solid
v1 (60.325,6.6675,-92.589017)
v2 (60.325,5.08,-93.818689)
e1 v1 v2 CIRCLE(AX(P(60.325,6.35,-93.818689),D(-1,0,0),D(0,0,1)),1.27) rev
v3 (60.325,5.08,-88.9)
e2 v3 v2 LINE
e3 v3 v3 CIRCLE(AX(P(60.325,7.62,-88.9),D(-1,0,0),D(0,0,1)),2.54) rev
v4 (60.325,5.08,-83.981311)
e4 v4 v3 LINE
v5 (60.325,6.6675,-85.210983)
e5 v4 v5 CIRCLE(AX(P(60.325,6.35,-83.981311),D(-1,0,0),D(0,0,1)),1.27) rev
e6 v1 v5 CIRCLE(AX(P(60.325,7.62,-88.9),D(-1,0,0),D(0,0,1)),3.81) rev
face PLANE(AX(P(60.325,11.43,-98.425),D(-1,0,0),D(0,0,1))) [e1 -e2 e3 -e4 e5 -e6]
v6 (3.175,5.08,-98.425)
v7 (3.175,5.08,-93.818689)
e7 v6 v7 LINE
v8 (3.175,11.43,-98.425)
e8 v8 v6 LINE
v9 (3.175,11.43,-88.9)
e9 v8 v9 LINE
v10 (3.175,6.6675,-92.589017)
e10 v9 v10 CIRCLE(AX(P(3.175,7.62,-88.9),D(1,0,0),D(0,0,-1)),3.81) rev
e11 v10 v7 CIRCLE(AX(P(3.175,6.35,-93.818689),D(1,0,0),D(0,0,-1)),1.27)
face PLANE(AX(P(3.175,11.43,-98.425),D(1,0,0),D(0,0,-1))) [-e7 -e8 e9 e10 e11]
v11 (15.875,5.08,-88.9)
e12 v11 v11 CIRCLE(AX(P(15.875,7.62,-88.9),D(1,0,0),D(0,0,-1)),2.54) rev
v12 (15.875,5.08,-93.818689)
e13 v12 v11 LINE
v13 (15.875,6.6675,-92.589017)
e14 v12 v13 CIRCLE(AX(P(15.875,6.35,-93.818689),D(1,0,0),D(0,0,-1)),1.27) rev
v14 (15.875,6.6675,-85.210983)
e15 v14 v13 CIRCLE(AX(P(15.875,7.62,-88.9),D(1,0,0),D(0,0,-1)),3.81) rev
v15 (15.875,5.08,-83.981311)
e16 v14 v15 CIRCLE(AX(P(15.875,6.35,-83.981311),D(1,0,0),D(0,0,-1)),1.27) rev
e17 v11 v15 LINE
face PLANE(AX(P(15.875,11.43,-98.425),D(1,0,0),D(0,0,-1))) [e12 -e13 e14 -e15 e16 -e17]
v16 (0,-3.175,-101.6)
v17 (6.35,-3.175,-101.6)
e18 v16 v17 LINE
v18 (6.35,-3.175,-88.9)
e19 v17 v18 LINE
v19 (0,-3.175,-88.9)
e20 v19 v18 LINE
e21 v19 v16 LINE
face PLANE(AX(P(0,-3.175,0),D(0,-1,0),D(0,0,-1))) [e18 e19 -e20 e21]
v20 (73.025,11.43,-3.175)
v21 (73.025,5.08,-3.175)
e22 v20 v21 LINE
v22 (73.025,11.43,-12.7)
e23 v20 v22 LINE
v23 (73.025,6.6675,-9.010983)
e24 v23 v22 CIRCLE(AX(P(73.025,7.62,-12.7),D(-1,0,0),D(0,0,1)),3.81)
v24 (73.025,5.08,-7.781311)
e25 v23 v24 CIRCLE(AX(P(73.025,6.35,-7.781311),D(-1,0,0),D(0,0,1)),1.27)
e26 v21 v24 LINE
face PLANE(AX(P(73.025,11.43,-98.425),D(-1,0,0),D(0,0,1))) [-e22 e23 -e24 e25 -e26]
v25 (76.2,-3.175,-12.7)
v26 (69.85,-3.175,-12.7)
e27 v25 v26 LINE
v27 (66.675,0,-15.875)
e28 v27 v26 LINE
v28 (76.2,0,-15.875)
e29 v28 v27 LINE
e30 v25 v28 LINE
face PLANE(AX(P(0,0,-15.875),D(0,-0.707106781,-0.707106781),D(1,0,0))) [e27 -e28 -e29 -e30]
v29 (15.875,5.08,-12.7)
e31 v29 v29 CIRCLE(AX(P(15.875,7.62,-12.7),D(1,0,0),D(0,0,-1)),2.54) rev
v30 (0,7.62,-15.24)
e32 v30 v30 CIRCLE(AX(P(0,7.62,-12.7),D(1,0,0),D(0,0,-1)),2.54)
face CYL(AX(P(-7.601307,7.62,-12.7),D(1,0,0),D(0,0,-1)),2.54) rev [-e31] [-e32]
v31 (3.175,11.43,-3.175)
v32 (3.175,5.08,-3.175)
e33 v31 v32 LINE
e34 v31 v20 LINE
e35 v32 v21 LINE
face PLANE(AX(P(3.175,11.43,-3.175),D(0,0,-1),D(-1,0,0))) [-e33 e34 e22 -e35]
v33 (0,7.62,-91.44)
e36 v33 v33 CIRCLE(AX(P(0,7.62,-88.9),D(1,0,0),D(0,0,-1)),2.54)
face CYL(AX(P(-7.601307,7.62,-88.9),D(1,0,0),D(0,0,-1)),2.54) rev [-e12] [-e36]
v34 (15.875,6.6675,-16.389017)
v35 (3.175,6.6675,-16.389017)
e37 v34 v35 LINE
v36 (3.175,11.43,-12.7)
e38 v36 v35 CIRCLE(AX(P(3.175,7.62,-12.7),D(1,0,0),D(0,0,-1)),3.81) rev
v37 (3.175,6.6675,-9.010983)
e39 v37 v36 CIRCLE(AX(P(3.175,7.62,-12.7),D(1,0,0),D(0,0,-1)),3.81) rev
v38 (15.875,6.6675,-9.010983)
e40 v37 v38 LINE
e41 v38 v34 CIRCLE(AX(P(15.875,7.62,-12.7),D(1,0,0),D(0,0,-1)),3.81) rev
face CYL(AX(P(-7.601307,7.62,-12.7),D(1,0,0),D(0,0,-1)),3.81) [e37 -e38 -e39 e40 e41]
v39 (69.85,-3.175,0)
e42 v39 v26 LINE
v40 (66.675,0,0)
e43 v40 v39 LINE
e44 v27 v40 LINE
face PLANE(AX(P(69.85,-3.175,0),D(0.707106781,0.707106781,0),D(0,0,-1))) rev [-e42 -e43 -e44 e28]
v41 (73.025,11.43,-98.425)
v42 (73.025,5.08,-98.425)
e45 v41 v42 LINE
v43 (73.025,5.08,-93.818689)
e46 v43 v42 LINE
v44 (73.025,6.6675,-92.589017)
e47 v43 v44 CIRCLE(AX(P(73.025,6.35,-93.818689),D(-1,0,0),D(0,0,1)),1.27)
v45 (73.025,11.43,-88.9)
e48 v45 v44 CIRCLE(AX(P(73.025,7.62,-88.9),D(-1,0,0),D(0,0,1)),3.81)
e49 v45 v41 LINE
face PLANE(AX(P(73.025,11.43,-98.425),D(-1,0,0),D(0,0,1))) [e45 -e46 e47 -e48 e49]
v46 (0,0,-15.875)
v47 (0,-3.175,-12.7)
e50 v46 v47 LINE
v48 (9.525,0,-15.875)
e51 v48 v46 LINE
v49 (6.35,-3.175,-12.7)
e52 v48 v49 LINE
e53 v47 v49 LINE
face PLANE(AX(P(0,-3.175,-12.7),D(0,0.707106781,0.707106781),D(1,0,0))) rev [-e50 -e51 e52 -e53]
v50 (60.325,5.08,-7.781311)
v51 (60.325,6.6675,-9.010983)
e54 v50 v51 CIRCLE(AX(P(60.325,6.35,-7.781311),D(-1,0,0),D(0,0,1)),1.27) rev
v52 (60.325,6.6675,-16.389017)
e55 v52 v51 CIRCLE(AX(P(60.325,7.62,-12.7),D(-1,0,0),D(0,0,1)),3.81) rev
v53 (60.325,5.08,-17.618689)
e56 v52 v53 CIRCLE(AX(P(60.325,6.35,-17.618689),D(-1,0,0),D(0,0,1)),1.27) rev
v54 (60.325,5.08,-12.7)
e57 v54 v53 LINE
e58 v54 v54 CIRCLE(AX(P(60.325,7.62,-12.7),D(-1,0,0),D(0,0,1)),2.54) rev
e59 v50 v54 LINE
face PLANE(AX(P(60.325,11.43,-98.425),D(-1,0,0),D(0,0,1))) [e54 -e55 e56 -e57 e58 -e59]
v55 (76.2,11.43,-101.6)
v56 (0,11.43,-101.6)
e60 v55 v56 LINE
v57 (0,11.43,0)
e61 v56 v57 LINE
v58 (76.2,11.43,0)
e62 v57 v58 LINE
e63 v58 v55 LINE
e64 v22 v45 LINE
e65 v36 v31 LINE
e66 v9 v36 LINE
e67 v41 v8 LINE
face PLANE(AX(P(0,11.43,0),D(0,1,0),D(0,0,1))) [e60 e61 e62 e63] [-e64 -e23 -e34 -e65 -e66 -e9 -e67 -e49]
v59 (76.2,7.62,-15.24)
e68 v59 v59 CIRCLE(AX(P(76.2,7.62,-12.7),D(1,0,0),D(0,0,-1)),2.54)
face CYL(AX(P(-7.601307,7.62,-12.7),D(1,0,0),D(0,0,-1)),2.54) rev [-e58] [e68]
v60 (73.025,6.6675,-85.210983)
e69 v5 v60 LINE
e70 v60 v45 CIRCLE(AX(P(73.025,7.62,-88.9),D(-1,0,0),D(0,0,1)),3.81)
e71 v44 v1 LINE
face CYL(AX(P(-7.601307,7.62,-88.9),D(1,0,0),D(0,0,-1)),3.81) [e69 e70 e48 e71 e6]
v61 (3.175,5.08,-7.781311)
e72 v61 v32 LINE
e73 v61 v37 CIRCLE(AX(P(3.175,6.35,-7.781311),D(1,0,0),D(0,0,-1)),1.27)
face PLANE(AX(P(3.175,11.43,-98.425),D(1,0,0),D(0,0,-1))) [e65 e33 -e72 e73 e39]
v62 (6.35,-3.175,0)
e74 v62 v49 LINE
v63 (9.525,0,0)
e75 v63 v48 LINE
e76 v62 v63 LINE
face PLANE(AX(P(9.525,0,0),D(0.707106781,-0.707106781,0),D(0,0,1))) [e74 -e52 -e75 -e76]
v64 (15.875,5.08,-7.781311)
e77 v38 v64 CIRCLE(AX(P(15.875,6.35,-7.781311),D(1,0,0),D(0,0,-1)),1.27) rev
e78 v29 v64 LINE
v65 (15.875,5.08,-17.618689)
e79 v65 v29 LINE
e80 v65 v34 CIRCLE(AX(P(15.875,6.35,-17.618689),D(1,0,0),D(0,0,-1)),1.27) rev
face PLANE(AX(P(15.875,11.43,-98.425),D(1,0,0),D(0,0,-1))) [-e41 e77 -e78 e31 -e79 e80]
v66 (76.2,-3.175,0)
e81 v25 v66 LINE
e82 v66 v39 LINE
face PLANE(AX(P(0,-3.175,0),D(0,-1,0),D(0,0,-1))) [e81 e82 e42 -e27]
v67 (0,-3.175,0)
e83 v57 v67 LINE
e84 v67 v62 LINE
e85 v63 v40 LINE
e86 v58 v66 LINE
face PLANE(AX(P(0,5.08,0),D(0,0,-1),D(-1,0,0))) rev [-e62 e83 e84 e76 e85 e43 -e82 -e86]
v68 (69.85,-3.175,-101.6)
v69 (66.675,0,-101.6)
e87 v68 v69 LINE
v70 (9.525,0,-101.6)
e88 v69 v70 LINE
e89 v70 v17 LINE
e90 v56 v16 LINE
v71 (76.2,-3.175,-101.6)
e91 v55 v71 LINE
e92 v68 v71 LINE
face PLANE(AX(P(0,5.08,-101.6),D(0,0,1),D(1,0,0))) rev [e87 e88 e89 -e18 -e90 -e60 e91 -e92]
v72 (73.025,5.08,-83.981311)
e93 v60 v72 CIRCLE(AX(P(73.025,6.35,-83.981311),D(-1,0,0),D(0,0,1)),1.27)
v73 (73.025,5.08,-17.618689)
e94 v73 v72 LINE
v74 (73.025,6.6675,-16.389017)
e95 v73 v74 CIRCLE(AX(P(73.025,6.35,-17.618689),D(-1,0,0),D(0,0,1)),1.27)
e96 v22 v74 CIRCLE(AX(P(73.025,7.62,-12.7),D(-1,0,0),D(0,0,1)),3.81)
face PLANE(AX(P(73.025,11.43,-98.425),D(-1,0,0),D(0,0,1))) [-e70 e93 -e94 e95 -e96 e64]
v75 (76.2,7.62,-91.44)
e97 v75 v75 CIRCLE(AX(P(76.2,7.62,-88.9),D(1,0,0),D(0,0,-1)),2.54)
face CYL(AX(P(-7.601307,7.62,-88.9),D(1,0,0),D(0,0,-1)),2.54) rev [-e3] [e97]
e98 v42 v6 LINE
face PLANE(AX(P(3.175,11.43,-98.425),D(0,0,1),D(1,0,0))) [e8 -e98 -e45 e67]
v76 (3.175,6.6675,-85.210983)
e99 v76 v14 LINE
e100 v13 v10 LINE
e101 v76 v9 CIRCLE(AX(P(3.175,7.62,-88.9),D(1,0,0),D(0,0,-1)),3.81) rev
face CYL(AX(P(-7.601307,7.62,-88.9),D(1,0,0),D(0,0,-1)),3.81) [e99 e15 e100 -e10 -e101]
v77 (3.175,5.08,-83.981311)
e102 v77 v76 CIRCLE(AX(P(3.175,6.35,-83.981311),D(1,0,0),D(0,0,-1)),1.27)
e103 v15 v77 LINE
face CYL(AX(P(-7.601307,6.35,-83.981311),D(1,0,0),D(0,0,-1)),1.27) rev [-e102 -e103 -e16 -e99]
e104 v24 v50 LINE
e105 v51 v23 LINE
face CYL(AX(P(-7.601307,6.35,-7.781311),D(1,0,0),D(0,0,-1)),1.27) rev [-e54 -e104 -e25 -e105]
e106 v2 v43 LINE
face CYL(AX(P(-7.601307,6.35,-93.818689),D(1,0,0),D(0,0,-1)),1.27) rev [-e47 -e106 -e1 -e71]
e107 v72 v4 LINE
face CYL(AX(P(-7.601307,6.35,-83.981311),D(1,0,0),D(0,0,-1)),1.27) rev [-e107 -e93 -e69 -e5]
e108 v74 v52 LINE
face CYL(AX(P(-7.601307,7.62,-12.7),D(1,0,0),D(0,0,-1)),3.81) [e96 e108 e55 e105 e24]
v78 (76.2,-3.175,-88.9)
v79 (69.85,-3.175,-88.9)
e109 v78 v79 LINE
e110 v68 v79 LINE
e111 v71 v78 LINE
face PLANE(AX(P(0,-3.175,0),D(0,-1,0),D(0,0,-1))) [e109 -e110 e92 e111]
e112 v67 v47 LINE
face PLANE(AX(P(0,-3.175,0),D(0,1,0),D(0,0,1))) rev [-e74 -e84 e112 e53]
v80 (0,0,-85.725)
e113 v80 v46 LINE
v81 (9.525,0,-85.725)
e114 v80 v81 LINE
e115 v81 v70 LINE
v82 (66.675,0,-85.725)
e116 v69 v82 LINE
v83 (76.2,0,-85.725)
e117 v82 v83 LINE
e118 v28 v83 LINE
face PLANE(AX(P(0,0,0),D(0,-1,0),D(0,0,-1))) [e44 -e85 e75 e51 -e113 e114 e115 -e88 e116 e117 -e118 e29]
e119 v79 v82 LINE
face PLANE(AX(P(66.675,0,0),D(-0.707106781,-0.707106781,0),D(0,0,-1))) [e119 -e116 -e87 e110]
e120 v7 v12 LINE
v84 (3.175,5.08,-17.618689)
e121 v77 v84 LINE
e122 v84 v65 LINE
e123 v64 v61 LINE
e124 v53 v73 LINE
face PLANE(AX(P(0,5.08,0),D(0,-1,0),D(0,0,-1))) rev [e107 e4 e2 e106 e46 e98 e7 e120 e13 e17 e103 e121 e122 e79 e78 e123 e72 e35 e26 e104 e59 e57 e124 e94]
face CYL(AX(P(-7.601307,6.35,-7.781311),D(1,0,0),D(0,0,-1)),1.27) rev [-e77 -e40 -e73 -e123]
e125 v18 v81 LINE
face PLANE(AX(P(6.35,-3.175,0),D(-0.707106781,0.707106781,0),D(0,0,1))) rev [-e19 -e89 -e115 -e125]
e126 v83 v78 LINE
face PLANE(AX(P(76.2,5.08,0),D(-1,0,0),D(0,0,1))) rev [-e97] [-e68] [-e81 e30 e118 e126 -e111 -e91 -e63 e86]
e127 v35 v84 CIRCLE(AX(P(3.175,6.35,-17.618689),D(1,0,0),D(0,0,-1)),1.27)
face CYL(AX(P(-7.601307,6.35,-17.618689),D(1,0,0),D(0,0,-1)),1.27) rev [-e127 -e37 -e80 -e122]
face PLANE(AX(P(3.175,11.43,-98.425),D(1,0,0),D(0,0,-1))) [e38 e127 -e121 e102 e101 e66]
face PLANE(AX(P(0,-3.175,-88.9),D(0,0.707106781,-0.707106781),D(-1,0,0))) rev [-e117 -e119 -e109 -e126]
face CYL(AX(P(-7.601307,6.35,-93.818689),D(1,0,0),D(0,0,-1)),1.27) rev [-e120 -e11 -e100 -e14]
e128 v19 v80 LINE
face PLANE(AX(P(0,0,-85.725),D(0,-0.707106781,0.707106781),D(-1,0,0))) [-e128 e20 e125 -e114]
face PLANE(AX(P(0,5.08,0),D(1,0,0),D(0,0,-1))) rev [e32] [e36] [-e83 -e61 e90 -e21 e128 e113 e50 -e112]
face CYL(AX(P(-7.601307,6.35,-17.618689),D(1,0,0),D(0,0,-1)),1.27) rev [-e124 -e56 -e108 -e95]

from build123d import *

# Parameters (mm, degrees)
SKETCH1_W           = 76.2
SKETCH1_H           = 101.6
BOSS_EXTRUDE1_DEPTH = 5.08
SKETCH4_W           = 76.2
SKETCH4_H           = 101.6
SKETCH4_W_2         = 69.85
SKETCH4_H_2         = 95.25
BOSS_EXTRUDE3_DEPTH = 6.35
SKETCH5_R           = 3.81
SKETCH5_R_2         = 2.54
BOSS_EXTRUDE4_DEPTH = 73.025
SKETCH6_R           = 2.54
CUT_EXTRUDE2_DEPTH  = 128.513312638
SKETCH7_W           = 44.45
SKETCH7_H           = 95.25
CUT_EXTRUDE3_DEPTH  = 128.158650905
FILLET1_R           = 1.27
SKETCH8_W           = 6.35
SKETCH8_H           = 12.7
BOSS_EXTRUDE5_DEPTH = 3.175
CHAMFER1_SIZE       = 3.175


with BuildPart() as part:
    # Sketch1 → Boss-Extrude1 (new body)
    with BuildSketch(Plane(origin=(0, 0, 0), x_dir=(1, 0, 0), z_dir=(0, 1, 0))):
        with Locations((38.1, 50.8)):
            Rectangle(SKETCH1_W, SKETCH1_H)
    extrude(amount=BOSS_EXTRUDE1_DEPTH)

    # Sketch4 → Boss-Extrude3 (add)
    with BuildSketch(Plane(origin=(0, 5.08, 0), x_dir=(1, 0, 0), z_dir=(0, 1, 0))):
        with Locations((38.1, 50.8)):
            Rectangle(SKETCH4_W, SKETCH4_H)
        with Locations((38.1, 50.8)):
            Rectangle(SKETCH4_W_2, SKETCH4_H_2, mode=Mode.SUBTRACT)
    extrude(amount=BOSS_EXTRUDE3_DEPTH)

    # Sketch5 → Boss-Extrude4 (add)
    # profile 1 of 2: a face of its own
    with BuildSketch(Plane(origin=(76.2, 0, 0), x_dir=(0, 0, -1), z_dir=(1, 0, 0))):
        with Locations((12.7, 7.62)):
            Circle(SKETCH5_R)
        with Locations((12.7, 7.62)):
            Circle(SKETCH5_R_2, mode=Mode.SUBTRACT)
    # profile 2 of 2: a face of its own
    with BuildSketch(Plane(origin=(76.2, 0, 0), x_dir=(0, 0, -1), z_dir=(1, 0, 0))):
        with Locations((88.9, 7.62)):
            Circle(SKETCH5_R)
        with Locations((88.9, 7.62)):
            Circle(SKETCH5_R_2, mode=Mode.SUBTRACT)
    extrude(amount=-BOSS_EXTRUDE4_DEPTH)

    # Sketch6 → Cut-Extrude2 (cut, through all)
    with BuildSketch(Plane(origin=(76.2, 0, 0), x_dir=(0, 0, -1), z_dir=(1, 0, 0))):
        with Locations((12.7, 7.62)):
            Circle(SKETCH6_R)
        with Locations((88.9, 7.62)):
            Circle(SKETCH6_R)
    extrude(amount=-CUT_EXTRUDE2_DEPTH, mode=Mode.SUBTRACT)

    # Sketch7 → Cut-Extrude3 (cut, through all)
    with BuildSketch(Plane(origin=(0, 5.08, 0), x_dir=(1, 0, 0), z_dir=(0, 1, 0))):
        with Locations((38.1, 50.8)):
            Rectangle(SKETCH7_W, SKETCH7_H)
    extrude(amount=CUT_EXTRUDE3_DEPTH, mode=Mode.SUBTRACT)

    # Fillet1
    fillet1_edges = [part.edges().sort_by_distance(p)[0] for p in [
        (66.675, 5.08, -91.739806331),
        (9.525, 5.08, -86.060193669),
        (66.675, 5.08, -15.539806331),
        (9.525, 5.08, -9.860193669),
        (66.675, 5.08, -9.860193669),
        (9.525, 5.08, -15.539806331),
        (66.675, 5.08, -86.060193669),
        (9.525, 5.08, -91.739806331),
    ]]
    fillet(fillet1_edges, radius=FILLET1_R)

    # Sketch8 → Boss-Extrude5 (add)
    with BuildSketch(Plane.XZ):
        with Locations((73.025, -6.35)):
            Rectangle(SKETCH8_W, SKETCH8_H)
        with Locations((73.025, -95.25)):
            Rectangle(SKETCH8_W, SKETCH8_H)
        with Locations((3.175, -95.25)):
            Rectangle(SKETCH8_W, SKETCH8_H)
        with Locations((3.175, -6.35)):
            Rectangle(SKETCH8_W, SKETCH8_H)
    extrude(amount=BOSS_EXTRUDE5_DEPTH)

    # Chamfer1
    chamfer1_edges = [part.edges().sort_by_distance(p)[0] for p in [
        (69.85, 0, -95.25),
        (73.025, 0, -88.9),
        (69.85, 0, -6.35),
        (73.025, 0, -12.7),
        (3.175, 0, -12.7),
        (6.35, 0, -6.35),
        (3.175, 0, -88.9),
        (6.35, 0, -95.25),
    ]]
    chamfer(chamfer1_edges, length=CHAMFER1_SIZE - 0.0001)  # a hair under: the kernel refuses the full size


solid = part.part
